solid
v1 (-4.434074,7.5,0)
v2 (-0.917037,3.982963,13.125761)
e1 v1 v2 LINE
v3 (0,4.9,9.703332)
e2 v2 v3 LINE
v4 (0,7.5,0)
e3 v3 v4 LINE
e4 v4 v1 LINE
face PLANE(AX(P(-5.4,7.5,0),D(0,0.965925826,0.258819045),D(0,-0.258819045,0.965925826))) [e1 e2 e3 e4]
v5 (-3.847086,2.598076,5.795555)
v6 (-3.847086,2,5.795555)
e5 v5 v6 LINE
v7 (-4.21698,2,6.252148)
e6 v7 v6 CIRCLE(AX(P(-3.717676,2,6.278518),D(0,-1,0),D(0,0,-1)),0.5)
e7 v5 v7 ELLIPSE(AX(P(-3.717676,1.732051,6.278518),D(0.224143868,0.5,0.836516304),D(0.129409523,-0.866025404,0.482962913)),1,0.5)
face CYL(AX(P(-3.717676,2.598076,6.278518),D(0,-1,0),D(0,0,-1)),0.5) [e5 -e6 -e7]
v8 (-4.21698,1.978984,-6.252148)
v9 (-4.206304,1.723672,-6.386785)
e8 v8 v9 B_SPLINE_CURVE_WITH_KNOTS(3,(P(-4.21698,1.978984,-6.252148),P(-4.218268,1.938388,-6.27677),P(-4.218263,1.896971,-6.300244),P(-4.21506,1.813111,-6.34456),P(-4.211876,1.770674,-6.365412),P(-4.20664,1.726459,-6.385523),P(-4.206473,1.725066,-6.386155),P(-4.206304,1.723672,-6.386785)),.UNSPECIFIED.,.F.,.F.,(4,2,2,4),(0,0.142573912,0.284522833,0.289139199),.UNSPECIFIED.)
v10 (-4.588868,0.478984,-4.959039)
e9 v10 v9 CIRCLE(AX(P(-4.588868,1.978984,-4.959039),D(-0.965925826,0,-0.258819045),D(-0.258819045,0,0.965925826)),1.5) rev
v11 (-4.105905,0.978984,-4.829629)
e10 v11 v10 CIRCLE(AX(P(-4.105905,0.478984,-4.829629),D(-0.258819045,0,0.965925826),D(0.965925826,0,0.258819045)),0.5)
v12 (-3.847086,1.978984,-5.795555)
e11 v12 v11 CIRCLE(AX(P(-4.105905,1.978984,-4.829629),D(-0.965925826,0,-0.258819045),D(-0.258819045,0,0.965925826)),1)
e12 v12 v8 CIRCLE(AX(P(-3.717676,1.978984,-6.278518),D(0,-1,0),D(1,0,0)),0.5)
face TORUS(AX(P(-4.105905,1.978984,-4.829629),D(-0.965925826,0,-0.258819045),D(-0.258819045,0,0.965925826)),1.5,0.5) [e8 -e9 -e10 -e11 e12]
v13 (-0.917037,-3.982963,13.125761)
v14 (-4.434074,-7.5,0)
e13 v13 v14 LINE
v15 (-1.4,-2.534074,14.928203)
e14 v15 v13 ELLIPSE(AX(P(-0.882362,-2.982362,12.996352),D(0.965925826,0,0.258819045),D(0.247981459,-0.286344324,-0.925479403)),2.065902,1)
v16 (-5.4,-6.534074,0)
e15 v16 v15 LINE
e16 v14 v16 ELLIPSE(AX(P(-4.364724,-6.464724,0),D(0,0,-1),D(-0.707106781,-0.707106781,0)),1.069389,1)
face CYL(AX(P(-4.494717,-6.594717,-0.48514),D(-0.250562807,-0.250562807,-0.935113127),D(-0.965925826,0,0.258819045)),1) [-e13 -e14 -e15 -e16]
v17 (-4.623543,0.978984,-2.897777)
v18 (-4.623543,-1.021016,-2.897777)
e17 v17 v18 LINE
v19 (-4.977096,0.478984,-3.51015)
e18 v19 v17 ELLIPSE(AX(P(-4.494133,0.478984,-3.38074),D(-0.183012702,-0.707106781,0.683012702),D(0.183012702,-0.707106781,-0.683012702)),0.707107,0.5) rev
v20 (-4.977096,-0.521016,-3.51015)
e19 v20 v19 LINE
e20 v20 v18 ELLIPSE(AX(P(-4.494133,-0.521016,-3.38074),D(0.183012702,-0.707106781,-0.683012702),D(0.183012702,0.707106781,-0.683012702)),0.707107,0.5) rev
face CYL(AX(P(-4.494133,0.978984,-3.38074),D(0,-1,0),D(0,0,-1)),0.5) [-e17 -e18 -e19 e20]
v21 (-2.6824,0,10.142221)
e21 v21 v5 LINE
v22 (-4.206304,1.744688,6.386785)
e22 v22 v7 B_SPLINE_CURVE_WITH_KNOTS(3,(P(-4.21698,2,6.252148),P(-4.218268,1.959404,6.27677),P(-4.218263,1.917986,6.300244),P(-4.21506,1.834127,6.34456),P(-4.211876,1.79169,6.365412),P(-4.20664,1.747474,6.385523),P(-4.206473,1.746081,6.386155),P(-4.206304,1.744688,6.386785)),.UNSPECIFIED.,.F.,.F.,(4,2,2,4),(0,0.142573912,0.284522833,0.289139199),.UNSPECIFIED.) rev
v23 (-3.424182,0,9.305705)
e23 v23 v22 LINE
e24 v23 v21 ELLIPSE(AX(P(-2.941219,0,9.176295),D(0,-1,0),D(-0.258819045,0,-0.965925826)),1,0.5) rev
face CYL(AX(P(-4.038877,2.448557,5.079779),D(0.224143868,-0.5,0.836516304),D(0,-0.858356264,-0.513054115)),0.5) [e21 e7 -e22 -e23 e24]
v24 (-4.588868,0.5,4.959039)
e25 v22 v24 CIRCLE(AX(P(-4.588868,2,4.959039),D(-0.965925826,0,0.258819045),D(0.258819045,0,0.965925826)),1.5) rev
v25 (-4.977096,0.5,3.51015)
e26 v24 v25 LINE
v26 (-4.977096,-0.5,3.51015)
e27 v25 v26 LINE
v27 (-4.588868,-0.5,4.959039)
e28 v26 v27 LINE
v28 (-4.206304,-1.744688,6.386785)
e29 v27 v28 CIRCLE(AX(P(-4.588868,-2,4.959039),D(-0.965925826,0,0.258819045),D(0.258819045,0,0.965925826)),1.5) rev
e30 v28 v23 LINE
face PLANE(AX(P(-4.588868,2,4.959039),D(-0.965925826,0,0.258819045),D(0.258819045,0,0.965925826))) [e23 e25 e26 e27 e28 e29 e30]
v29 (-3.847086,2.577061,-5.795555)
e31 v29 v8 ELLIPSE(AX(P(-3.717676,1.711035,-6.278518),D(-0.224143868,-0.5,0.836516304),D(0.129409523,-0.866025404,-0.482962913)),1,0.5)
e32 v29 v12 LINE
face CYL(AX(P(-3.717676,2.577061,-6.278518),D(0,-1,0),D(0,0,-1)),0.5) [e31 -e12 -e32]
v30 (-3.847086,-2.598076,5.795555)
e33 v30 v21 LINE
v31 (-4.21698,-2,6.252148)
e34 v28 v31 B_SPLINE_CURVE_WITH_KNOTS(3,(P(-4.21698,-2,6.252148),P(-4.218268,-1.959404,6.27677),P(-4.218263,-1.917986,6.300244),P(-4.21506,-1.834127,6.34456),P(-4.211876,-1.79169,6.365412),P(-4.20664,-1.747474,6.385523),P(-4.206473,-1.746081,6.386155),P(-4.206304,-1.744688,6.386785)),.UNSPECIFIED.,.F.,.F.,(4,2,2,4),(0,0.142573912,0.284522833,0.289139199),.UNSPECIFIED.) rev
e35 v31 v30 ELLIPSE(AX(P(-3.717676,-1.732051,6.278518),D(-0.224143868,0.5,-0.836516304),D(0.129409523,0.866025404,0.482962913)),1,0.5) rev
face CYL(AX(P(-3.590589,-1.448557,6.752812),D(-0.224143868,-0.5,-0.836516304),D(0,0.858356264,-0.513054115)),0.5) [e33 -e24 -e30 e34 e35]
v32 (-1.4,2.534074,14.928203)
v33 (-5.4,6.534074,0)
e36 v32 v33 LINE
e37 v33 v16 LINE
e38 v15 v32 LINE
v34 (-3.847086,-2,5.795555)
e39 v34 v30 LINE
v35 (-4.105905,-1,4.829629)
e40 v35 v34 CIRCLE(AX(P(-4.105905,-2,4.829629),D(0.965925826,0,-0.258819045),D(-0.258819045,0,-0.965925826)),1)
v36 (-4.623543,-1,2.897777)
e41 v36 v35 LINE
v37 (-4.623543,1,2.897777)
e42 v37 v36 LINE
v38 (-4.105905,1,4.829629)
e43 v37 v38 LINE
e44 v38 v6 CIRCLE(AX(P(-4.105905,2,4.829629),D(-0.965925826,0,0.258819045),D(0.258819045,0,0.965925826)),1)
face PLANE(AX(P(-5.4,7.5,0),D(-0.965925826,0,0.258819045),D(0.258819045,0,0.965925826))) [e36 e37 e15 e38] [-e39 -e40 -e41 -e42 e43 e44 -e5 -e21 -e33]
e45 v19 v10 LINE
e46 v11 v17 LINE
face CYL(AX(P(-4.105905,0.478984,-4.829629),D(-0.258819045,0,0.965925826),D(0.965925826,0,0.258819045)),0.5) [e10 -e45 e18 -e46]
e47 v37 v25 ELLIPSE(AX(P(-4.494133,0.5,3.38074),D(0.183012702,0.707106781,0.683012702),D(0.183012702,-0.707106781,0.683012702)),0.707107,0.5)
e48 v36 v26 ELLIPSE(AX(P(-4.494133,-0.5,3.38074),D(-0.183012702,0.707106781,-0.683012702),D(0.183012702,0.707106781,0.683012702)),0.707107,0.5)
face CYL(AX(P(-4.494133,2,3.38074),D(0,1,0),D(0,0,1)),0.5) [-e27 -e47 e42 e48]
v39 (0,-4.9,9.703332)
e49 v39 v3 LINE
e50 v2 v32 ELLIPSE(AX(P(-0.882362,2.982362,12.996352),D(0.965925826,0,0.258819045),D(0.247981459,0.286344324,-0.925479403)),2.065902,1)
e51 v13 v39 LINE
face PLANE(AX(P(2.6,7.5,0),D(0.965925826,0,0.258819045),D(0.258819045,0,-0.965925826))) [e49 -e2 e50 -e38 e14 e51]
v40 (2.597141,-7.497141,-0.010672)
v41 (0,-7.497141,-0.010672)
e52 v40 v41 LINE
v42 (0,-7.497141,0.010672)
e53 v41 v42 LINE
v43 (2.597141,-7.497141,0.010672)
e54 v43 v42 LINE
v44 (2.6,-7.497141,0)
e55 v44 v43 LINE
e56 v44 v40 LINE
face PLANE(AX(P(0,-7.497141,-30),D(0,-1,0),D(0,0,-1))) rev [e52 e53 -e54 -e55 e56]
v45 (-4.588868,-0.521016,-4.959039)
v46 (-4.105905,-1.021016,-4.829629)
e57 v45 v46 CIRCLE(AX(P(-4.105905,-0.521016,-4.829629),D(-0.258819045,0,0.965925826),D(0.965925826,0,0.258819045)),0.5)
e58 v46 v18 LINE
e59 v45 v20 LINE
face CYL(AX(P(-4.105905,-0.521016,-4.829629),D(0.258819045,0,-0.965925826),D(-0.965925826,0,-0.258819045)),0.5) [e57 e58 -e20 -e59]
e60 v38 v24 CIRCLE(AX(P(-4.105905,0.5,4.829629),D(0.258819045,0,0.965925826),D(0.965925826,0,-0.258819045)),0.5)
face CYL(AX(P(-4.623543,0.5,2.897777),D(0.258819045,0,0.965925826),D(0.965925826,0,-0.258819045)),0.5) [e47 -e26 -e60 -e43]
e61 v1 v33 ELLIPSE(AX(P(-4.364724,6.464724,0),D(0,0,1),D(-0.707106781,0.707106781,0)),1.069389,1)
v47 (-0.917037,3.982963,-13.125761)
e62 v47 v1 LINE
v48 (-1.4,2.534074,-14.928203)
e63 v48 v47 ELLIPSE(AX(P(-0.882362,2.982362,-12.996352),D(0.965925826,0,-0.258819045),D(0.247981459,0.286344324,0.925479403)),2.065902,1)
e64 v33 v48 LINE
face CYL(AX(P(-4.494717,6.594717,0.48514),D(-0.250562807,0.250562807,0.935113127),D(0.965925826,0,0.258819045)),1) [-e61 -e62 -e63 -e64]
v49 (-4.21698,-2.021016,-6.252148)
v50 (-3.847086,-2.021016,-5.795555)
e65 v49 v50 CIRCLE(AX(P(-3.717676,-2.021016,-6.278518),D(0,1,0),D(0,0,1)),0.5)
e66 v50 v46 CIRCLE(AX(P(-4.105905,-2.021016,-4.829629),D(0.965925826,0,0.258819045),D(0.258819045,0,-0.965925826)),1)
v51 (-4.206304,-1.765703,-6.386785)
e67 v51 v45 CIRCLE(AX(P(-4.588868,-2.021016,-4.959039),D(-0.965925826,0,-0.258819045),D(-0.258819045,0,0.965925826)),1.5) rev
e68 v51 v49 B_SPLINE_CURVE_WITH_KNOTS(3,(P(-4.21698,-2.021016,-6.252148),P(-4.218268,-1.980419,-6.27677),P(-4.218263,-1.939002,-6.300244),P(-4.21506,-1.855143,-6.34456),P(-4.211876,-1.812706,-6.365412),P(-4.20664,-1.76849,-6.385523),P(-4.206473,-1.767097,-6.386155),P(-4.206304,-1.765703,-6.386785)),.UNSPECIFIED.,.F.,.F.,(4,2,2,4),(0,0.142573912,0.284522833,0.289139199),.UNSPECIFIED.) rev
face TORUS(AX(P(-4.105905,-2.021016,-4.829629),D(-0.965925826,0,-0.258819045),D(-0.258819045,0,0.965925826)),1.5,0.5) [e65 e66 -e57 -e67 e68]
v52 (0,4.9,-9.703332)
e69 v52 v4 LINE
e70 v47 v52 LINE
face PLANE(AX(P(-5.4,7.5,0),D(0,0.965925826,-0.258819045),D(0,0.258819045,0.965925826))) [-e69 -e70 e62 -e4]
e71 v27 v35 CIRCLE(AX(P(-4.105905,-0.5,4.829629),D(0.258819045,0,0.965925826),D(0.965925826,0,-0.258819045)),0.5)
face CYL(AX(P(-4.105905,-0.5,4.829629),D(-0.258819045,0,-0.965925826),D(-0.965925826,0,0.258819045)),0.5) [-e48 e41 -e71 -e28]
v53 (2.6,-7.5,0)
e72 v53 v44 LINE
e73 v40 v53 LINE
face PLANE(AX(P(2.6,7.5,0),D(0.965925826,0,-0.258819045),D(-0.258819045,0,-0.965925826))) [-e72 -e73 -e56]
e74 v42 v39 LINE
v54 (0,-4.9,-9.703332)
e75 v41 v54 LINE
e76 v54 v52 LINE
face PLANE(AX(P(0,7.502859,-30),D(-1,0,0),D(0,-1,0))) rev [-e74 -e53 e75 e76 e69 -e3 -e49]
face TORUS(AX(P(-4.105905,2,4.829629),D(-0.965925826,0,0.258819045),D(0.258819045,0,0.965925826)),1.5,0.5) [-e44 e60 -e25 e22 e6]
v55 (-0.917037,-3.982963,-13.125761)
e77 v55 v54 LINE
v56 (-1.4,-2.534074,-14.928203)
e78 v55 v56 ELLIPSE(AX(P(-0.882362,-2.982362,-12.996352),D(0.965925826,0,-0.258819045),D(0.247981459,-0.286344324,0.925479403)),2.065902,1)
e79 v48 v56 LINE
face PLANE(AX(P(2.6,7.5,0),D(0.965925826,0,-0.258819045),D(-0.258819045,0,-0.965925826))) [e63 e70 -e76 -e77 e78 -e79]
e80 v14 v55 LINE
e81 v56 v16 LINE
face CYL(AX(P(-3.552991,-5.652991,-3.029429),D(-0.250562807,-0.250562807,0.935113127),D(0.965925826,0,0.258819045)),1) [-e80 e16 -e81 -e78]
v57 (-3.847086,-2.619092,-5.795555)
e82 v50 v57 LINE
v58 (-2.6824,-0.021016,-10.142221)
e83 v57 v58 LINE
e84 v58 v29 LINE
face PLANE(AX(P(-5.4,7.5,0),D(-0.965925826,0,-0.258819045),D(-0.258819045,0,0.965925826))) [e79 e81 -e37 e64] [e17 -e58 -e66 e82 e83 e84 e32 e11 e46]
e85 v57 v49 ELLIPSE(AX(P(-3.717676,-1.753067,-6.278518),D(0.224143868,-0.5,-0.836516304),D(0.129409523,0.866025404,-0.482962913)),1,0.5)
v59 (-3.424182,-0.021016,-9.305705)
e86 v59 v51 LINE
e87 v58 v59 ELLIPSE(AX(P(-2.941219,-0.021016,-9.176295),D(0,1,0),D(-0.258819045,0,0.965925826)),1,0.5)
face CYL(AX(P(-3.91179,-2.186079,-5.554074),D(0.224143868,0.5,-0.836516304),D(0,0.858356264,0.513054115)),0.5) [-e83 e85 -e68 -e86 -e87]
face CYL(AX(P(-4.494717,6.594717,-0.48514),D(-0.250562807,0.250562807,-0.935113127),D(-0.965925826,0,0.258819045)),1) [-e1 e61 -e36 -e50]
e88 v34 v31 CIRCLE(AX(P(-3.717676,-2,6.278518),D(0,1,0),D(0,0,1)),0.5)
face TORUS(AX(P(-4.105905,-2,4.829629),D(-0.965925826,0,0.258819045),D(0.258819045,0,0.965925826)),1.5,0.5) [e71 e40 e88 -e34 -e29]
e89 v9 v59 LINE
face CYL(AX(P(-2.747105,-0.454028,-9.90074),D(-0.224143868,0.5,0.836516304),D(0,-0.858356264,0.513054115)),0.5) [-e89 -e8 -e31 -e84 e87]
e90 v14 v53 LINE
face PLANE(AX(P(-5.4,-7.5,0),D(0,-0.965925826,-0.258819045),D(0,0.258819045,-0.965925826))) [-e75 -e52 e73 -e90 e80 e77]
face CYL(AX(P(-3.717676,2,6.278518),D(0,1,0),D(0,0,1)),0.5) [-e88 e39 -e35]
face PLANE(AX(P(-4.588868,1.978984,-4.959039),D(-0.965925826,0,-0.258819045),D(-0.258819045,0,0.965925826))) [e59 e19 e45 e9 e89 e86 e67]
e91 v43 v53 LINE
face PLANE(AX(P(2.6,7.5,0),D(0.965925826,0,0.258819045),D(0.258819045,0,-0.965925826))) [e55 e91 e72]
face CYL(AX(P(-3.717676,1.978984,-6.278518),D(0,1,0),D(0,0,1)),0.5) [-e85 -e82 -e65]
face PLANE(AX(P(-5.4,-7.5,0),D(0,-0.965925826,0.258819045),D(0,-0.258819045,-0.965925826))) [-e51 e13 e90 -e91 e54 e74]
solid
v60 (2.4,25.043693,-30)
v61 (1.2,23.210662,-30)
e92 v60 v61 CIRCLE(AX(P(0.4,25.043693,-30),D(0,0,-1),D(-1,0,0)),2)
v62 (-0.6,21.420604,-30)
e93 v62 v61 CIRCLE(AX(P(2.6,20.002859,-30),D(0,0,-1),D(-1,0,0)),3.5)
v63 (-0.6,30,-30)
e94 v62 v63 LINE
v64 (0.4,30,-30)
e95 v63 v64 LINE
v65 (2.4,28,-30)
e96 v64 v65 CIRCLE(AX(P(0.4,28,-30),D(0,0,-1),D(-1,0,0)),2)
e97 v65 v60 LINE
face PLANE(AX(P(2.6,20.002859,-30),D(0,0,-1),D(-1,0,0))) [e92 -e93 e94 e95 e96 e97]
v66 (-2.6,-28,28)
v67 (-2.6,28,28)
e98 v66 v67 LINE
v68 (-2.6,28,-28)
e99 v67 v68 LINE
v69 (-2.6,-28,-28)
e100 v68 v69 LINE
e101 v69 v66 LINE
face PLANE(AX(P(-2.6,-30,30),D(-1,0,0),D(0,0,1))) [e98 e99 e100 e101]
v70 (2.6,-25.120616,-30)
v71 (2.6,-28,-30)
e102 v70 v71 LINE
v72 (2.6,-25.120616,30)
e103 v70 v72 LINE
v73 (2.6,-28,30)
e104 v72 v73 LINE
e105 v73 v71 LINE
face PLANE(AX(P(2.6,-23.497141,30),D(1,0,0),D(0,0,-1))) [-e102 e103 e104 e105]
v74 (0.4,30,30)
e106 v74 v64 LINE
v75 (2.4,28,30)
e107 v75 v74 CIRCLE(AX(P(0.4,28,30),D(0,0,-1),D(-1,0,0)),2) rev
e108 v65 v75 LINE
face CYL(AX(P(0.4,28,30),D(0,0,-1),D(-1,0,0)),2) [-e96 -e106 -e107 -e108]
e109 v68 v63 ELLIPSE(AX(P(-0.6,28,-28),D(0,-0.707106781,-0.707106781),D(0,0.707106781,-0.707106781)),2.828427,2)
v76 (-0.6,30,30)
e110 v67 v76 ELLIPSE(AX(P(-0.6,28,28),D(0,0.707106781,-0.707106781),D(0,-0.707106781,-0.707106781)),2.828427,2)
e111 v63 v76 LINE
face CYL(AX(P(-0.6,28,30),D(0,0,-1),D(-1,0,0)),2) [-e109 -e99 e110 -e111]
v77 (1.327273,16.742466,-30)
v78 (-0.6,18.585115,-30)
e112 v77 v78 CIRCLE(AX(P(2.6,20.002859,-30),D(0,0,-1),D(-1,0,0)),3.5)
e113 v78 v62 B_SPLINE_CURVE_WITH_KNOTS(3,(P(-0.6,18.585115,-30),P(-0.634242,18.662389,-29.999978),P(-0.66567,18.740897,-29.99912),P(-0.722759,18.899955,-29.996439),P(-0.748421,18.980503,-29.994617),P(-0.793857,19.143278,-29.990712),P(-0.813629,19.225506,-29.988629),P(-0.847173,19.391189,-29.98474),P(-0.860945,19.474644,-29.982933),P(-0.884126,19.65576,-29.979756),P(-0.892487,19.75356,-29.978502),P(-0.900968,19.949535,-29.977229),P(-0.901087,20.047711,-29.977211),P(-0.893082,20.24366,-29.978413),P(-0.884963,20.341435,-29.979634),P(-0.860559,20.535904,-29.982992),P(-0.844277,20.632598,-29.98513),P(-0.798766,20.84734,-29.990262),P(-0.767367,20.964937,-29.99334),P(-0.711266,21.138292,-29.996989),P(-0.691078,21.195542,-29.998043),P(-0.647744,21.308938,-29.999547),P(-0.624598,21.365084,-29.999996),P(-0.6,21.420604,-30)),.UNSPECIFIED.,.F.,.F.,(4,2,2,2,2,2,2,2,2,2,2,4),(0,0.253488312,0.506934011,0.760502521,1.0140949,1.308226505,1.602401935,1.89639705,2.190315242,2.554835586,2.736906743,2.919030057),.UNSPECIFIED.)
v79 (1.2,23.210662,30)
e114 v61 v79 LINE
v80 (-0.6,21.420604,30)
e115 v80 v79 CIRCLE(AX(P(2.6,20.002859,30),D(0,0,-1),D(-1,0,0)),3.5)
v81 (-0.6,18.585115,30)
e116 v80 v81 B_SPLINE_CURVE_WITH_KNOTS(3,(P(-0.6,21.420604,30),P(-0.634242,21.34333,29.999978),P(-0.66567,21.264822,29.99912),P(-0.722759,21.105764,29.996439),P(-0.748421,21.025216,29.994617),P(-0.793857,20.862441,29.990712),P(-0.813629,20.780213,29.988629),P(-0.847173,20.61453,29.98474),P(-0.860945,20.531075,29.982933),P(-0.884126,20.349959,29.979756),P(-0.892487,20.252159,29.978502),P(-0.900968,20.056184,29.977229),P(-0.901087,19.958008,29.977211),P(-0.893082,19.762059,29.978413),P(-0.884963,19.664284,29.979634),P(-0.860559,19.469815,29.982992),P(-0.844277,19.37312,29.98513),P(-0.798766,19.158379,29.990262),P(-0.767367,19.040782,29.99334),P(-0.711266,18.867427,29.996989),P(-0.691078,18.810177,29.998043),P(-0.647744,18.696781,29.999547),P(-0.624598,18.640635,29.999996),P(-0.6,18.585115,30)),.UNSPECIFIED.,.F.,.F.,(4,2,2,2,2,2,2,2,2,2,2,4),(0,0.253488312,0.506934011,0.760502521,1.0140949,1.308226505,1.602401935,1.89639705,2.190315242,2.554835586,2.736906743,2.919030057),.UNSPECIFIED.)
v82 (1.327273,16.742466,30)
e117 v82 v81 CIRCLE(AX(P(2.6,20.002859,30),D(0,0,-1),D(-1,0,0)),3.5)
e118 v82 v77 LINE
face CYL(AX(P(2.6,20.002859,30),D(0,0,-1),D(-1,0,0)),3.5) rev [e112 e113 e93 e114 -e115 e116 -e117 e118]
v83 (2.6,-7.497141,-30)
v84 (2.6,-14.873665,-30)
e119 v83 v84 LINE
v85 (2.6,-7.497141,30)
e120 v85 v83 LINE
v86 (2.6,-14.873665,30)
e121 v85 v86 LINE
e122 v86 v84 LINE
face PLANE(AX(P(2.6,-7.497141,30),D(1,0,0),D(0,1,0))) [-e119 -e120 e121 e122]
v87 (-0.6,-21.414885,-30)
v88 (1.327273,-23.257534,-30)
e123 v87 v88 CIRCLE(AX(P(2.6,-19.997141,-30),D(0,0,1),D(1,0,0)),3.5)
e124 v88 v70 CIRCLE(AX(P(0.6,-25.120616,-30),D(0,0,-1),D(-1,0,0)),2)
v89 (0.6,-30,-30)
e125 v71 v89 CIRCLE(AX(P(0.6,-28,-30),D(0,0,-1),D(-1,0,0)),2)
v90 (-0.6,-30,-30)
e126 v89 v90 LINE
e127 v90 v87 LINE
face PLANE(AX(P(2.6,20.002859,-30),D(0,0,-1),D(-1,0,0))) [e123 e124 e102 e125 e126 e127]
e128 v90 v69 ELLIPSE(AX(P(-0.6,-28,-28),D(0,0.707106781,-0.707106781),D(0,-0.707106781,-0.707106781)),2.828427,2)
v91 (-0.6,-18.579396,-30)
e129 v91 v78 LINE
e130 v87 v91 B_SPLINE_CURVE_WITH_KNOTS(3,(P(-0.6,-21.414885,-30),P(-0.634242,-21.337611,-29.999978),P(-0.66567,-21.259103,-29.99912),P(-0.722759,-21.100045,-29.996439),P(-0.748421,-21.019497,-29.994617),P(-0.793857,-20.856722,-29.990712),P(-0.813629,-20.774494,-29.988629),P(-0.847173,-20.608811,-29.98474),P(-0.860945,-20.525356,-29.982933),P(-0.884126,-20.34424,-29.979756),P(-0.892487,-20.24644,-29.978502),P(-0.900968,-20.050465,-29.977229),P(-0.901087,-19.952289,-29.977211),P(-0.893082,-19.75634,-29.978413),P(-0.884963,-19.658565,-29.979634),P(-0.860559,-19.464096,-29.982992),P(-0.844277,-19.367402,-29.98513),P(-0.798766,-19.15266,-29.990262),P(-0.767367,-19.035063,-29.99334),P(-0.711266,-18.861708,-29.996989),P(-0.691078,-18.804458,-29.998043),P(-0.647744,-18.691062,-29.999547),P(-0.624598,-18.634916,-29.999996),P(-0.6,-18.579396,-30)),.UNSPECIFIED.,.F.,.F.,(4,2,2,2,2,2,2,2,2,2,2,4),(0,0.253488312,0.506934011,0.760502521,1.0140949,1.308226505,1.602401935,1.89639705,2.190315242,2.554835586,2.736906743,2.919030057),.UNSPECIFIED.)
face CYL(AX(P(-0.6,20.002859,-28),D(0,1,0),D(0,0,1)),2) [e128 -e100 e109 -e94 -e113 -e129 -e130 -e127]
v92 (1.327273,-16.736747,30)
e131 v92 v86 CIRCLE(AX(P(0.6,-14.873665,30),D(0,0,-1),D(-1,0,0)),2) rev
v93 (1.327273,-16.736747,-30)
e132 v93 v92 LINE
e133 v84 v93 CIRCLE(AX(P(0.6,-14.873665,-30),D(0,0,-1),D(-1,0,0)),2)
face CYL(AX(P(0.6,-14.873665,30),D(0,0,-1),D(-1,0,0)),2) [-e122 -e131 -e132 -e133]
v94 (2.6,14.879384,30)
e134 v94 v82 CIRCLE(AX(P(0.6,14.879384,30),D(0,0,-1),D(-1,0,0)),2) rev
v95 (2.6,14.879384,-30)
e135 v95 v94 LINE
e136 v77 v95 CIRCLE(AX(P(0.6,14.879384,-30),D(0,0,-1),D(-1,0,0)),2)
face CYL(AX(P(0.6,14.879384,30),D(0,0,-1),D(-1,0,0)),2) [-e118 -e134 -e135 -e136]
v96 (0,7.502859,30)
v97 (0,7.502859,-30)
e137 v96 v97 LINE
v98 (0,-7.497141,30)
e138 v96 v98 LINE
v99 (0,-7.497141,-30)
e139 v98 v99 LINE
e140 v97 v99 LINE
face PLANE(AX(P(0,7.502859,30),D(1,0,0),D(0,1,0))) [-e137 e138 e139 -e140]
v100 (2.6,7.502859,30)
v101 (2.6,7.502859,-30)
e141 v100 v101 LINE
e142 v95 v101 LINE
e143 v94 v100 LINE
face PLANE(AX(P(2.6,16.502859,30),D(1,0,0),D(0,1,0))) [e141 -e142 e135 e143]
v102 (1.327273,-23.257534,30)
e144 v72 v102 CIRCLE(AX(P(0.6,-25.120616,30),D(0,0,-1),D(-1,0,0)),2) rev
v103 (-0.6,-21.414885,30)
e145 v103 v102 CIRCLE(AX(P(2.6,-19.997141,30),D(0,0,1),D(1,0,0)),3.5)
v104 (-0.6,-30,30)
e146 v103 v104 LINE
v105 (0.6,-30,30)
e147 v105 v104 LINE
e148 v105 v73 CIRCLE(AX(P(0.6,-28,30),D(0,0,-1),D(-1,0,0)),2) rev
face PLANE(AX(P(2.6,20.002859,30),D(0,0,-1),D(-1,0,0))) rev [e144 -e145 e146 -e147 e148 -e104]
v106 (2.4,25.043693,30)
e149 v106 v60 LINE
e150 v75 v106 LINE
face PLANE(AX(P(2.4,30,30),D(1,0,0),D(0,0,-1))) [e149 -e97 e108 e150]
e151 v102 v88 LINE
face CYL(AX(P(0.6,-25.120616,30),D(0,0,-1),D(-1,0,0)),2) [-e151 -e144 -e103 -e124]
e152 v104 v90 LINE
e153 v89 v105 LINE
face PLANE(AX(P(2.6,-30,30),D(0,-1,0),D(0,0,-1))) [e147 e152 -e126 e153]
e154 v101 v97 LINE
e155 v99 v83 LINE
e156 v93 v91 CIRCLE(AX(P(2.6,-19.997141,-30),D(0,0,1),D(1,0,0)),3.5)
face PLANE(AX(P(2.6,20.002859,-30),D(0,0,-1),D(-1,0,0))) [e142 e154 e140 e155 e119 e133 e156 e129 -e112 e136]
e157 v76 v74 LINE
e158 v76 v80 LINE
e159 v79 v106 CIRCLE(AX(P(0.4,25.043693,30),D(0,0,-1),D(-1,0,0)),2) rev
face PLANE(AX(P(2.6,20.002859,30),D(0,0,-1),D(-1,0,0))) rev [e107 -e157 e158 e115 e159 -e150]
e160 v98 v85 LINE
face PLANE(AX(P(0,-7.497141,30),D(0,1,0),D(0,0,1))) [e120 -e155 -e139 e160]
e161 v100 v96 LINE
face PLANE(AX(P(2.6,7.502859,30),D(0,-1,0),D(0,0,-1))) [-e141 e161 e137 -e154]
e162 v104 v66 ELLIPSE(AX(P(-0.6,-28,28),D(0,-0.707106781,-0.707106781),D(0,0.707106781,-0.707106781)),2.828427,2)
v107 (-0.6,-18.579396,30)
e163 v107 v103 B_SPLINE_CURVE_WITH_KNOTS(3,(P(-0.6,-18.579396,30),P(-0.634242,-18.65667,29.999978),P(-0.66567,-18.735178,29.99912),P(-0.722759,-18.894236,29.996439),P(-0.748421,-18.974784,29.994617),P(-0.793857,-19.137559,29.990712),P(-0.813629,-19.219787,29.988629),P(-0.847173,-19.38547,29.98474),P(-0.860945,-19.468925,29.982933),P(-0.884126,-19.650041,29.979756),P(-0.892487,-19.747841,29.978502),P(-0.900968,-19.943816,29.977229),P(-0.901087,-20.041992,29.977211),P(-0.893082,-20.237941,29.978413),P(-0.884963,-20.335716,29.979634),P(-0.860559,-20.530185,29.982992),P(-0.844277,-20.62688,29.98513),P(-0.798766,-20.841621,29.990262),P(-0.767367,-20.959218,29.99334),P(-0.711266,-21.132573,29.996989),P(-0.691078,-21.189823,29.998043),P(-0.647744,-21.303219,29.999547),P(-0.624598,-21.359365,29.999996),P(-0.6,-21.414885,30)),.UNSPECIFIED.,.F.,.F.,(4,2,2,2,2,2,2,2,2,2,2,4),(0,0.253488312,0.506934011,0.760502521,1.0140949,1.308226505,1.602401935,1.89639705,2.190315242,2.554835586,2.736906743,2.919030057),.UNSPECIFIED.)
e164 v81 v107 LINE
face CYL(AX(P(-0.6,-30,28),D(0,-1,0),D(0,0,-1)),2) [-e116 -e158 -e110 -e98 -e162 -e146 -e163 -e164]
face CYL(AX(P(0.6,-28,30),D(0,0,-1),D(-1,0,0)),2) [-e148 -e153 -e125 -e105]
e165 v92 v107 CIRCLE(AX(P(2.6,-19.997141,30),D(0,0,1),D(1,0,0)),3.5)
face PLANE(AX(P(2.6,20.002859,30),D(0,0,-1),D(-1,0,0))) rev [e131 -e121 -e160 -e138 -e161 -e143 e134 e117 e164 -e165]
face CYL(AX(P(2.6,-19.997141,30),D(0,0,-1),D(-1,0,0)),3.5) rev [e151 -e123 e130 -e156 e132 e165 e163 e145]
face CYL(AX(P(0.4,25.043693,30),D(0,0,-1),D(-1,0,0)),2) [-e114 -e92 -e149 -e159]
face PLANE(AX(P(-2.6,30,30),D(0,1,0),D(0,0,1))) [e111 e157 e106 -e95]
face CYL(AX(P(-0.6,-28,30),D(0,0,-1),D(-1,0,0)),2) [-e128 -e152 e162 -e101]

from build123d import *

# Parameters (mm, degrees)
SALIENTE_EXTRUIR1_DEPTH       = 30
REDONDEO1_R                   = 2
SALIENTE_EXTRUIR2_START       = -3.5
SALIENTE_EXTRUIR2_DEPTH       = 7
SALIENTE_EXTRUIR2_START_2     = -15.187316551
SALIENTE_EXTRUIR2_2_DEPTH     = 29.673057242
SALIENTE_EXTRUIR2_START_3     = -18
SALIENTE_EXTRUIR2_3_OUTLINE_W = 26
SALIENTE_EXTRUIR2_3_OUTLINE_H = 32
SALIENTE_EXTRUIR2_3_DEPTH     = 33.799218947
SALIENTE_EXTRUIR4_DEPTH       = 0.5
REDONDEO6_R                   = 0.5
SALIENTE_EXTRUIR5_DEPTH       = 0.5
REDONDEO7_R                   = 0.5
REDONDEO8_R                   = 1
REDONDEO9_R                   = 2
CROQUIS6_W                    = 2.6
CROQUIS6_H                    = 15
CORTAR_EXTRUIR1_DEPTH         = 68.29903431


with BuildPart() as part:
    # Croquis1 → Saliente-Extruir1 (new, symmetric)
    with BuildSketch(Plane.XY):
        with BuildLine():
            Line((2.6, -23.497140521), (2.6, -30))
            Line((2.6, -30), (-2.6, -30))
            Line((-2.6, -30), (-2.6, 30))
            Line((-2.6, 30), (2.4, 30))
            Line((2.4, 30), (2.4, 23.497140521))
            ThreePointArc((2.4, 23.497140521), (-0.898569968, 19.902818604), (2.6, 16.502859479))
            Line((2.6, 16.502859479), (2.6, 7.502859479))
            Line((2.6, 7.502859479), (0, 7.502859479))
            Line((0, 7.502859479), (0, -7.497140521))
            Line((0, -7.497140521), (2.6, -7.497140521))
            Line((2.6, -7.497140521), (2.6, -16.497140521))
            ThreePointArc((2.6, -16.497140521), (-0.9, -19.997140521), (2.6, -23.497140521))
        make_face()
    extrude(amount=SALIENTE_EXTRUIR1_DEPTH, both=True)

    # Redondeo1
    # the kernel refuses this fillet: 2 mm, written as the material it takes off along each edge
    with BuildSketch(Plane(origin=(-2.6, -35, 30), x_dir=(1, 0, 0), z_dir=(0, 1, 0)), Plane(origin=(-2.6, -35, -30), x_dir=(0, 0, 1), z_dir=(0, 1, 0)), Plane(origin=(2.4, 30, 35), x_dir=(0, -1, 0), z_dir=(0, 0, -1)), Plane(origin=(-2.6, 30, 35), x_dir=(1, 0, 0), z_dir=(0, 0, -1)), Plane(origin=(-2.6, -30, 35), x_dir=(0, 1, 0), z_dir=(0, 0, -1)), Plane(origin=(2.6, -30, 35), x_dir=(-1, 0, 0), z_dir=(0, 0, -1))) as redondeo1_piece_1:
        with BuildLine():
            CenterArc((REDONDEO1_R, REDONDEO1_R), REDONDEO1_R, 180, 90)
            Line((0, REDONDEO1_R), (0, 0))
            Line((0, 0), (REDONDEO1_R, 0))
        make_face()
    extrude(amount=70, mode=Mode.SUBTRACT)
    with BuildSketch(Plane(origin=(2.6, -23.497140521, 34.058688457), x_dir=(0, -1, 0), z_dir=(0, 0, -1))) as redondeo1_piece_2:
        with BuildLine():
            CenterArc((1.623475383, 2), REDONDEO1_R, 201.323686263, 68.676313737)
            ThreePointArc((-0.239606574, 1.272727273), (-0.06042321, 0.647542667), (0, 0))
            Line((0, 0), (1.623475383, 0))
        make_face()
    extrude(amount=68.117376915, mode=Mode.SUBTRACT)
    with BuildSketch(Plane(origin=(2.4, 23.497140521, 33.866380556), x_dir=(-0.9726665465042704, -0.23220635071301512, 0), z_dir=(0, 0, -1))) as redondeo1_piece_3:
        with BuildLine():
            CenterArc((1.586213845, 1.968692311), REDONDEO1_R, 193.427003719, 66.421821522)
            Line((-0.359119248, 1.504279609), (0, 0))
            ThreePointArc((0, 0), (0.61686094, 0.054788456), (1.23372188, 0))
        make_face()
    extrude(amount=67.732761113, mode=Mode.SUBTRACT)

    # Redondeo9
    redondeo9_edges = [part.edges().sort_by_distance(p)[0] for p in [
        (2.6, -16.497140521, 0),
        (2.6, 16.502859479, 0),
    ]]
    fillet(redondeo9_edges, radius=REDONDEO9_R)


with BuildPart() as body_2:
    # Saliente-Extruir2: read off the stored shape, not the designer's step
    # Saliente-Extruir2 outline → Saliente-Extruir2 (new body)
    with BuildSketch(Plane(origin=(0, 0, 0), x_dir=(1, 0, 0), z_dir=(0, 1, 0)).offset(SALIENTE_EXTRUIR2_START)):
        Polygon((2.6, 0), (-1.4, 14.92820323), (-5.4, 0), (-1.4, -14.92820323), align=None)
    extrude(amount=SALIENTE_EXTRUIR2_DEPTH)

    # Saliente-Extruir2 2 outline → Saliente-Extruir2 2 (add)
    with BuildSketch(Plane(origin=(0, 0, 0), x_dir=(0.9681003458863747, 0.06485042646813632, 0.24202508647159393), z_dir=(0.25056280708573186, -0.25056280708573186, -0.9351131265310292)).offset(SALIENTE_EXTRUIR2_START_2)):
        Polygon((2.030682701, 7.244443697), (-5.714120066, 7.244443697), (-4.741363669, -7.244443697), (3.003439098, -7.244443697), align=None)
    extrude(amount=SALIENTE_EXTRUIR2_2_DEPTH)

    # Saliente-Extruir2 3 outline → Saliente-Extruir2 3 (cut)
    with BuildSketch(Plane(origin=(0, 0, 0), x_dir=(0.9681003458863747, 0.06485042646813632, -0.24202508647159393), z_dir=(0.25056280708573186, -0.25056280708573186, 0.9351131265310292)).offset(SALIENTE_EXTRUIR2_START_3)):
        with Locations((-1, 0)):
            Rectangle(SALIENTE_EXTRUIR2_3_OUTLINE_W, SALIENTE_EXTRUIR2_3_OUTLINE_H)
        Polygon((3.003439098, 7.244443697), (2.030682701, -7.244443697), (-5.714120066, -7.244443697), (-4.741363669, 7.244443697), align=None, mode=Mode.SUBTRACT)
    extrude(amount=SALIENTE_EXTRUIR2_3_DEPTH, mode=Mode.SUBTRACT)

    # Croquis4 → Saliente-Extruir4 (add)
    with BuildSketch(Plane(origin=(0.486941537, 0, -21.970364919), x_dir=(0.25881904510252135, 0, -0.9659258262890682), z_dir=(0.9659258262890681, 0, 0.2588190451025213))):
        with BuildLine():
            Line((-16.745395475, -2.021015706), (-16.745395475, -2.619091917))
            Line((-16.745395475, -2.619091917), (-12.245395475, -0.021015706))
            Line((-12.245395475, -0.021015706), (-16.745395475, 2.577060506))
            Line((-16.745395475, 2.577060506), (-16.745395475, 1.978984294))
            ThreePointArc((-16.745395475, 1.978984294), (-17.038288694, 1.271877513), (-17.745395475, 0.978984294))
            Line((-17.745395475, 0.978984294), (-19.745395475, 0.978984294))
            Line((-19.745395475, 0.978984294), (-19.745395475, -1.021015706))
            Line((-19.745395475, -1.021015706), (-17.745395475, -1.021015706))
            ThreePointArc((-17.745395475, -1.021015706), (-17.038288694, -1.313908925), (-16.745395475, -2.021015706))
        make_face()
    extrude(amount=-SALIENTE_EXTRUIR4_DEPTH)

    # Redondeo6
    # the kernel refuses this fillet: 0.5 mm, written as the material it takes off along each edge
    with BuildSketch(Plane(origin=(-4.588867688, 0.978984294, -4.959038654), x_dir=(0.9659258262890682, 0, 0.2588190451025214), z_dir=(-0.25881904510252135, 0, 0.9659258262890682)), Plane(origin=(-5.430029584, -1.021015706, -1.819779719), x_dir=(0.9659258262890682, 0, 0.2588190451025214), z_dir=(0.25881904510252135, 0, -0.9659258262890682))) as redondeo6_piece_1:
        with BuildLine():
            CenterArc((REDONDEO6_R, -REDONDEO6_R), REDONDEO6_R, 90, 90)
            Line((0, -REDONDEO6_R), (0, 0))
            Line((0, 0), (REDONDEO6_R, 0))
        make_face()
    extrude(amount=3.25, mode=Mode.SUBTRACT)
    with BuildSketch(Plane(origin=(-5.106505778, 2.228984294, -3.027187001), x_dir=(0.9659258262890685, 0, 0.2588190451025201), z_dir=(0, -1, 0))) as redondeo6_piece_2:
        with BuildLine():
            CenterArc((REDONDEO6_R, -REDONDEO6_R), REDONDEO6_R, 90, 90)
            Line((0, -REDONDEO6_R), (0, 0))
            Line((0, 0), (REDONDEO6_R, 0))
        make_face()
    extrude(amount=4.5, mode=Mode.SUBTRACT)
    with BuildSketch(Plane(origin=(-4.588867688, -2.021015706, -4.959038654), x_dir=(0, 1, 0), z_dir=(-0.25881904510252135, -7.32307077246263e-15, 0.9659258262890682))) as redondeo6_piece_3:
        with BuildLine():
            CenterArc((1 + REDONDEO6_R, -REDONDEO6_R), REDONDEO6_R, 90, 90)
            Line((1 + REDONDEO6_R, 0), (1, 0))
            Line((1, 0), (1, -REDONDEO6_R))
        make_face()
    revolve(axis=Axis((-4.588867688, -2.021015706, -4.959038654), (-0.9659258262890682, 0, -0.25881904510252135)), revolution_arc=90, mode=Mode.SUBTRACT)
    with BuildSketch(Plane(origin=(-4.610228478, -3.244091917, -4.879319101), x_dir=(0.9659258262890678, 2.238086743988656e-15, 0.25881904510252257), z_dir=(0.2241438680420138, 0.5000000000000003, -0.8365163037378075)), Plane(origin=(-2.885183105, -0.646015706, -11.317276078), x_dir=(0.9659258262890683, 0, 0.2588190451025209), z_dir=(-0.22414386804201394, 0.49999999999999983, 0.8365163037378079))) as redondeo6_piece_4:
        with BuildLine():
            CenterArc((REDONDEO6_R, -REDONDEO6_R), REDONDEO6_R, 90, 90)
            Line((0, -REDONDEO6_R), (0, 0))
            Line((0, 0), (REDONDEO6_R, 0))
        make_face()
    extrude(amount=7.696152423, mode=Mode.SUBTRACT)
    with BuildSketch(Plane(origin=(-4.588867688, 1.978984294, -4.959038654), x_dir=(0.2588190451025222, 3.108624468950456e-15, -0.9659258262890679), z_dir=(0, 1, 0))) as redondeo6_piece_5:
        with BuildLine():
            CenterArc((1 + REDONDEO6_R, -REDONDEO6_R), REDONDEO6_R, 90, 90)
            Line((1 + REDONDEO6_R, 0), (1, 0))
            Line((1, 0), (1, -REDONDEO6_R))
        make_face()
    revolve(axis=Axis((-4.588867688, 1.978984294, -4.959038654), (-0.9659258262890682, 0, -0.25881904510252135)), revolution_arc=90, mode=Mode.SUBTRACT)
    with BuildSketch(Plane(origin=(-4.330048643, 3.827060506, -5.92496448), x_dir=(0.9659258262890695, 0, 0.2588190451025165), z_dir=(0, -1, 0)), Plane(origin=(-4.330048643, -2.021015706, -5.92496448), x_dir=(0.9659258262890695, 0, 0.2588190451025165), z_dir=(0, -1, 0))) as redondeo6_piece_6:
        with BuildLine():
            CenterArc((REDONDEO6_R, -REDONDEO6_R), REDONDEO6_R, 90, 90)
            Line((0, -REDONDEO6_R), (0, 0))
            Line((0, 0), (REDONDEO6_R, 0))
        make_face()
    extrude(amount=1.848076211, mode=Mode.SUBTRACT)

    # Croquis5 → Saliente-Extruir5 (add)
    with BuildSketch(Plane(origin=(-5.03826859, 0, 1.35), x_dir=(0.25881904510252135, 0, 0.9659258262890682), z_dir=(-0.9659258262890681, 0, 0.2588190451025213))):
        with BuildLine():
            Line((4.602377156, -2), (4.602377156, -2.598076211))
            Line((4.602377156, -2.598076211), (9.102377156, 0))
            Line((9.102377156, 0), (4.602377156, 2.598076211))
            Line((4.602377156, 2.598076211), (4.602377156, 2))
            ThreePointArc((4.602377156, 2), (4.309483938, 1.292893219), (3.602377156, 1))
            Line((3.602377156, 1), (1.602377156, 1))
            Line((1.602377156, 1), (1.602377156, -1))
            Line((1.602377156, -1), (3.602377156, -1))
            ThreePointArc((3.602377156, -1), (4.309483938, -1.292893219), (4.602377156, -2))
        make_face()
    extrude(amount=SALIENTE_EXTRUIR5_DEPTH)

    # Redondeo7
    # the kernel refuses this fillet: 0.5 mm, written as the material it takes off along each edge
    with BuildSketch(Plane(origin=(-4.588867688, 2, 4.959038654), x_dir=(0.2588190451025221, 1.5543122344752223e-15, 0.9659258262890679), z_dir=(0, 1, 0))) as redondeo7_piece_1:
        with BuildLine():
            CenterArc((1 + REDONDEO7_R, REDONDEO7_R), REDONDEO7_R, 180, 90)
            Line((1 + REDONDEO7_R, 0), (1, 0))
            Line((1, 0), (1, REDONDEO7_R))
        make_face()
    revolve(axis=Axis((-4.588867688, 2, 4.959038654), (0.9659258262890682, 0, -0.25881904510252135)), revolution_arc=90, mode=Mode.SUBTRACT)
    with BuildSketch(Plane(origin=(-2.885183105, -0.625, 11.317276078), x_dir=(0.965925826289068, 0, -0.2588190451025217), z_dir=(-0.22414386804201394, 0.49999999999999967, -0.8365163037378079)), Plane(origin=(-4.610228478, -3.223076211, 4.879319101), x_dir=(0.9659258262890681, 0, -0.25881904510252185), z_dir=(0.2241438680420139, 0.4999999999999999, 0.8365163037378078))) as redondeo7_piece_2:
        with BuildLine():
            CenterArc((REDONDEO7_R, REDONDEO7_R), REDONDEO7_R, 180, 90)
            Line((0, REDONDEO7_R), (0, 0))
            Line((0, 0), (REDONDEO7_R, 0))
        make_face()
    extrude(amount=7.696152423, mode=Mode.SUBTRACT)
    with BuildSketch(Plane(origin=(-4.588867688, -2, 4.959038654), x_dir=(0, 1, 0), z_dir=(-0.25881904510252135, 0, -0.9659258262890682))) as redondeo7_piece_3:
        with BuildLine():
            CenterArc((1 + REDONDEO7_R, REDONDEO7_R), REDONDEO7_R, 180, 90)
            Line((1 + REDONDEO7_R, 0), (1, 0))
            Line((1, 0), (1, REDONDEO7_R))
        make_face()
    revolve(axis=Axis((-4.588867688, -2, 4.959038654), (0.9659258262890682, 0, -0.25881904510252135)), revolution_arc=90, mode=Mode.SUBTRACT)
    with BuildSketch(Plane(origin=(-5.430029584, -1, 1.819779719), x_dir=(0.9659258262890682, 0, -0.2588190451025214), z_dir=(0.25881904510252135, 0, 0.9659258262890682)), Plane(origin=(-4.588867688, 1, 4.959038654), x_dir=(0.9659258262890681, 0, -0.2588190451025213), z_dir=(-0.25881904510252135, 0, -0.9659258262890682))) as redondeo7_piece_4:
        with BuildLine():
            CenterArc((REDONDEO7_R, REDONDEO7_R), REDONDEO7_R, 180, 90)
            Line((0, REDONDEO7_R), (0, 0))
            Line((0, 0), (REDONDEO7_R, 0))
        make_face()
    extrude(amount=3.25, mode=Mode.SUBTRACT)
    with BuildSketch(Plane(origin=(-5.106505778, 2.25, 3.027187001), x_dir=(0.9659258262890681, 0, -0.25881904510252174), z_dir=(0, -1, 0))) as redondeo7_piece_5:
        with BuildLine():
            CenterArc((REDONDEO7_R, REDONDEO7_R), REDONDEO7_R, 180, 90)
            Line((0, REDONDEO7_R), (0, 0))
            Line((0, 0), (REDONDEO7_R, 0))
        make_face()
    extrude(amount=4.5, mode=Mode.SUBTRACT)
    with BuildSketch(Plane(origin=(-4.330048643, -2, 5.92496448), x_dir=(0.9659258262890681, 0, -0.25881904510252174), z_dir=(0, -1, 0)), Plane(origin=(-4.330048643, 3.848076211, 5.92496448), x_dir=(0.9659258262890682, 0, -0.2588190451025215), z_dir=(0, -1, 0))) as redondeo7_piece_6:
        with BuildLine():
            CenterArc((REDONDEO7_R, REDONDEO7_R), REDONDEO7_R, 180, 90)
            Line((0, REDONDEO7_R), (0, 0))
            Line((0, 0), (REDONDEO7_R, 0))
        make_face()
    extrude(amount=1.848076211, mode=Mode.SUBTRACT)

    # Redondeo8
    redondeo8_edges = [body_2.edges().sort_by_distance(p)[0] for p in [
        (-3.4, 5.5, -7.464101615),
        (-3.4, 5.5, 7.464101615),
        (-3.4, -5.5, 7.464101615),
        (-3.4, -5.5, -7.464101615),
    ]]
    fillet(redondeo8_edges, radius=REDONDEO8_R)

    # Croquis6 → Cortar-Extruir1 (cut, through all)
    with BuildSketch(Plane.XY.offset(30)):
        with Locations((1.3, 0.002859479)):
            Rectangle(CROQUIS6_W, CROQUIS6_H)
    extrude(amount=-CORTAR_EXTRUIR1_DEPTH, mode=Mode.SUBTRACT)


solid = Compound([part.part, body_2.part])
